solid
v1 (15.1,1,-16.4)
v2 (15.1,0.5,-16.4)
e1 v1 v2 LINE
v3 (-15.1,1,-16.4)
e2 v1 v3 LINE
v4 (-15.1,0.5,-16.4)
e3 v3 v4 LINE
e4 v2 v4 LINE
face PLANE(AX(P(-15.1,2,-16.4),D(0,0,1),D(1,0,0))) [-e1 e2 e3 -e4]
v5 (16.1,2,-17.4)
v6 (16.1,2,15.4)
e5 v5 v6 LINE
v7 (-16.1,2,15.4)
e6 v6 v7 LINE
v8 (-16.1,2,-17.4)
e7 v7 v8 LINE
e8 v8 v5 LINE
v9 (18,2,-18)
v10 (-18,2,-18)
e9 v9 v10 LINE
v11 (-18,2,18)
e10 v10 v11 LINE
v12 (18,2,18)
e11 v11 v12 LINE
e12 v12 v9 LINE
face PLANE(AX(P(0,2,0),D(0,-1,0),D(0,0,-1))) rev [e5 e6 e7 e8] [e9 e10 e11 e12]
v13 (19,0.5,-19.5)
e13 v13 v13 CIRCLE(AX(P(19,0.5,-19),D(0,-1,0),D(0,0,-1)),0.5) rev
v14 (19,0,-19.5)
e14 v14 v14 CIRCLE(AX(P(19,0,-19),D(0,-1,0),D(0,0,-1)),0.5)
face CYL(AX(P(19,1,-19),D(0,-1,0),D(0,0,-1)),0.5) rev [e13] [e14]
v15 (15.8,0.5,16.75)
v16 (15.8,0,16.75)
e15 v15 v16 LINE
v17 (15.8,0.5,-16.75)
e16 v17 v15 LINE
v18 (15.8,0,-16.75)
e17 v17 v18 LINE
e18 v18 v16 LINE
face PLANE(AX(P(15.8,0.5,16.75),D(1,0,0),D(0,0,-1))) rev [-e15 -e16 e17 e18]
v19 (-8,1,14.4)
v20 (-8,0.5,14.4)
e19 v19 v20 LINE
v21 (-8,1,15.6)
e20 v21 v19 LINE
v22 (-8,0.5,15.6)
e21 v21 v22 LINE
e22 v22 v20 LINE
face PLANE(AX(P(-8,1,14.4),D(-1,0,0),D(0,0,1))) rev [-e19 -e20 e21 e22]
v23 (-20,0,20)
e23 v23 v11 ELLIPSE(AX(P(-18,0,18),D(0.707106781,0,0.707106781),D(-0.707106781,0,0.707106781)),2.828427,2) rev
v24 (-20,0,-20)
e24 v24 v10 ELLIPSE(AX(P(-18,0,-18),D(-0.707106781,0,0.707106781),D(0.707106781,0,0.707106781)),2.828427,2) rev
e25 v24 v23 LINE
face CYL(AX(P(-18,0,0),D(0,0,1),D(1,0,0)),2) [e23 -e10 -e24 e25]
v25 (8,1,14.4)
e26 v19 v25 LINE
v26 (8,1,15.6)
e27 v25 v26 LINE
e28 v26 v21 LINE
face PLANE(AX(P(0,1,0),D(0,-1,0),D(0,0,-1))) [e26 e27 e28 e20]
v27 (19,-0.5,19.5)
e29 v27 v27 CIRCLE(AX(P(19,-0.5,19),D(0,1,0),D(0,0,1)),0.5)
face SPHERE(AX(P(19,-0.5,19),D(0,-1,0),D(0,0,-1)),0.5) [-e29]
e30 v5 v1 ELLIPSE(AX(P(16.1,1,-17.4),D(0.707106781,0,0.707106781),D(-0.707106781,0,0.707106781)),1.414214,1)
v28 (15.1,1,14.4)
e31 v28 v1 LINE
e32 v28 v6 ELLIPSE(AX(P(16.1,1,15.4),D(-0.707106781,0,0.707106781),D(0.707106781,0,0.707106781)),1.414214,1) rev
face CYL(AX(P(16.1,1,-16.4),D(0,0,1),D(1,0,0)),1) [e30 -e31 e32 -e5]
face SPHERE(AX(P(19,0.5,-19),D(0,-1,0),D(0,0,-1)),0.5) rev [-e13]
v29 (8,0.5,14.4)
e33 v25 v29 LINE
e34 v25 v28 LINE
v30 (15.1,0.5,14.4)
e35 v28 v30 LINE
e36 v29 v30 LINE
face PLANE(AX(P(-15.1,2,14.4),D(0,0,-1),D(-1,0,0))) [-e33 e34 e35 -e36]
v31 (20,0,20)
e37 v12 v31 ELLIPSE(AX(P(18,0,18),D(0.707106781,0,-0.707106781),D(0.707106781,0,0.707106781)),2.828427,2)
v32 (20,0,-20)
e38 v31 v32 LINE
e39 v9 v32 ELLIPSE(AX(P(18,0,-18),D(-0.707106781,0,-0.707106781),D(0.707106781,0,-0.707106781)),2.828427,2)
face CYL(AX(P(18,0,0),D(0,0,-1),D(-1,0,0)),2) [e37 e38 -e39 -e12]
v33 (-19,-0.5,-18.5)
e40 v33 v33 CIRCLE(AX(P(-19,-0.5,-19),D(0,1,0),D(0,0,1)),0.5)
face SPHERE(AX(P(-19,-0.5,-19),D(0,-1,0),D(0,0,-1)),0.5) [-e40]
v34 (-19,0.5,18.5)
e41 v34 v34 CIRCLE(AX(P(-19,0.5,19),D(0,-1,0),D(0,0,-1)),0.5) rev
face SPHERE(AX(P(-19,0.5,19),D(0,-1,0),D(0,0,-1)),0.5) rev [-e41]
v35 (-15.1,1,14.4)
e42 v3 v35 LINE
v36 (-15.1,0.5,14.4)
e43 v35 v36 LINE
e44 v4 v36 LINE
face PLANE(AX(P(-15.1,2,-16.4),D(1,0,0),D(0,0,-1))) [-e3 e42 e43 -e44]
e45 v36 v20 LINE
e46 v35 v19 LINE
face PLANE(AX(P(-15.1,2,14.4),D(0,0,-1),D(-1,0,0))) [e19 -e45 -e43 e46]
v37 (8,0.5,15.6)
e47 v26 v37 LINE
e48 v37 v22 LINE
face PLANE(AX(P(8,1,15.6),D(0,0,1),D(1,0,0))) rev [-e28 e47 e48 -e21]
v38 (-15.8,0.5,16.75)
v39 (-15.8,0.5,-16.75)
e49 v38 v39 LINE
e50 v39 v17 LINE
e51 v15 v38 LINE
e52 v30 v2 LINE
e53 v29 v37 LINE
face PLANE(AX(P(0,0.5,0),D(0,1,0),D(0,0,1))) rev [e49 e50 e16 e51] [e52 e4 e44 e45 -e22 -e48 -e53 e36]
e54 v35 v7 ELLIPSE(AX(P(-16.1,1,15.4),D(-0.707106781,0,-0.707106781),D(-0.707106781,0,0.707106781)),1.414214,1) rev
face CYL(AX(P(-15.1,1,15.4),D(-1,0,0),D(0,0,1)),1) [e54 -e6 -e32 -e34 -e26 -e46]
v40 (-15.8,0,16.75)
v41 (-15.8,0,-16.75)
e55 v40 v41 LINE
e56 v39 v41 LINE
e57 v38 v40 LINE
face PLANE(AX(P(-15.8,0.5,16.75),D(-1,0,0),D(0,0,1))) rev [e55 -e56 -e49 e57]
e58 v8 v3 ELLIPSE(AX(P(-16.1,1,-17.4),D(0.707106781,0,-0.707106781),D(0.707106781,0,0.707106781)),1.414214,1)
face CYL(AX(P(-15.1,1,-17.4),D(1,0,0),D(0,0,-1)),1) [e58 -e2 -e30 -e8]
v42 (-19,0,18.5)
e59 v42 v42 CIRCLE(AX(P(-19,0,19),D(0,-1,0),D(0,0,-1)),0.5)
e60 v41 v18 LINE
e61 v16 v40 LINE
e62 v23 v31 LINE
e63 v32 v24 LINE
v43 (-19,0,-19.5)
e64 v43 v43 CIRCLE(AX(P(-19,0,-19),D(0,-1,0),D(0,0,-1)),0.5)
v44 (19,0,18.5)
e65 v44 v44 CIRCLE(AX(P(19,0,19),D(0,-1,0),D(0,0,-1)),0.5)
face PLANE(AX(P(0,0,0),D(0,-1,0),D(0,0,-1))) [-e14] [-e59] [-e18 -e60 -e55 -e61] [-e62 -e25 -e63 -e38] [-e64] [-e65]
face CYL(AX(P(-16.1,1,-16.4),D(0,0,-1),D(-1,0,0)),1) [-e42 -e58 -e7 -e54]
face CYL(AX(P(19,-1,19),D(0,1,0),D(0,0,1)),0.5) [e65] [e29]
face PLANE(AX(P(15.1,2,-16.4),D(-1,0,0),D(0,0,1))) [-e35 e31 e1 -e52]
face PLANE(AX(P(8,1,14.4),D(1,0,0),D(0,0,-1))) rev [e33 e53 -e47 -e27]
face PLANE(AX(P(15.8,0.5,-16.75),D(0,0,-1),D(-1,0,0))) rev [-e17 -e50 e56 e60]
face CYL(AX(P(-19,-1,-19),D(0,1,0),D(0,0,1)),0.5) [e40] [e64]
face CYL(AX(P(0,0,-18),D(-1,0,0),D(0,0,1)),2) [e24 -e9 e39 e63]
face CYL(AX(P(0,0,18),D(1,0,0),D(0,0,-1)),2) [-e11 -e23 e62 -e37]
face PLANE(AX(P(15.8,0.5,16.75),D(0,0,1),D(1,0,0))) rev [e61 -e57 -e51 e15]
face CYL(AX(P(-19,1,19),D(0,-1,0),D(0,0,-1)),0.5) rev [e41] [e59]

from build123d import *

# Parameters (mm, degrees)
SKETCH_1_W          = 40
SKETCH_1_H          = 40
SKETCH_1_W_2        = 30.2
SKETCH_1_H_2        = 30.8
EXTRUDE_1_DEPTH     = 2
SKETCH_2_W          = 31.6
SKETCH_2_H          = 33.5
CUT_EXTRUDE_1_DEPTH = 0.5
SKETCH_3_W          = 16
SKETCH_3_H          = 1.2
CUT_EXTRUDE_2_DEPTH = 0.5
FILLET_1_R          = 1
FILLET_2_R          = 2
SKETCH_4_R          = 0.5
EXTRUDE_2_DEPTH     = 1
FILLET_4_R          = 0.5
SKETCH_5_R          = 0.5
CUT_EXTRUDE_3_DEPTH = 1
FILLET_5_R          = 0.5
FILLET_6_R          = 0.5


with BuildPart() as part:
    # 草图1 → 凸台-拉伸1 (new body)
    with BuildSketch(Plane(origin=(0, 0, 0), x_dir=(1, 0, 0), z_dir=(0, 1, 0))):
        Rectangle(SKETCH_1_W, SKETCH_1_H)
        with Locations((0, 1)):
            Rectangle(SKETCH_1_W_2, SKETCH_1_H_2, mode=Mode.SUBTRACT)
    extrude(amount=EXTRUDE_1_DEPTH)

    # 草图2 → 切除-拉伸1 (cut)
    with BuildSketch(Plane.XZ):
        Rectangle(SKETCH_2_W, SKETCH_2_H)
    extrude(amount=-CUT_EXTRUDE_1_DEPTH, mode=Mode.SUBTRACT)

    # 草图3 → 切除-拉伸2 (cut)
    with BuildSketch(Plane.XZ.offset(-0.5)):
        with Locations((0, 15)):
            Rectangle(SKETCH_3_W, SKETCH_3_H)
    extrude(amount=-CUT_EXTRUDE_2_DEPTH, mode=Mode.SUBTRACT)

    # 圆角1
    fillet_1_edges = [part.edges().sort_by_distance(p)[0] for p in [
        (15.1, 2, -1),
        (0, 2, -16.4),
        (-15.1, 2, -1),
        (0, 2, 14.4),
    ]]
    fillet(fillet_1_edges, radius=FILLET_1_R - 0.0001)  # a hair under: the kernel refuses the full size

    # 圆角2
    fillet_2_edges = [part.edges().sort_by_distance(p)[0] for p in [
        (0, 2, -20),
        (20, 2, 0),
        (0, 2, 20),
        (-20, 2, 0),
    ]]
    fillet(fillet_2_edges, radius=FILLET_2_R - 0.0001)  # a hair under: the kernel refuses the full size

    # 草图4 → 凸台-拉伸2 (add)
    with BuildSketch(Plane.XZ):
        with Locations(Location((-19, -19, 0), (0, 0, 270))):
            Circle(SKETCH_4_R)
        with Locations(Location((19, 19, 0), (0, 0, 270))):
            Circle(SKETCH_4_R)
    extrude(amount=EXTRUDE_2_DEPTH)

    # 圆角4
    fillet_4_edges = [part.edges().sort_by_distance(p)[0] for p in [
        (19, -1, 19.5),
    ]]
    fillet(fillet_4_edges, radius=FILLET_4_R)

    # 草图5 → 切除-拉伸3 (cut)
    with BuildSketch(Plane.XZ):
        with Locations(Location((19, -19, 0), (0, 0, 270))):
            Circle(SKETCH_5_R)
        with Locations(Location((-19, 19, 0), (0, 0, 270))):
            Circle(SKETCH_5_R)
    extrude(amount=-CUT_EXTRUDE_3_DEPTH, mode=Mode.SUBTRACT)

    # 圆角5
    fillet_5_edges = [part.edges().sort_by_distance(p)[0] for p in [
        (19, 1, -18.5),
        (-19, 1, 19.5),
    ]]
    fillet(fillet_5_edges, radius=FILLET_5_R)

    # 圆角6
    fillet_6_edges = [part.edges().sort_by_distance(p)[0] for p in [
        (-19, -1, -18.5),
    ]]
    fillet(fillet_6_edges, radius=FILLET_6_R)


solid = part.part
